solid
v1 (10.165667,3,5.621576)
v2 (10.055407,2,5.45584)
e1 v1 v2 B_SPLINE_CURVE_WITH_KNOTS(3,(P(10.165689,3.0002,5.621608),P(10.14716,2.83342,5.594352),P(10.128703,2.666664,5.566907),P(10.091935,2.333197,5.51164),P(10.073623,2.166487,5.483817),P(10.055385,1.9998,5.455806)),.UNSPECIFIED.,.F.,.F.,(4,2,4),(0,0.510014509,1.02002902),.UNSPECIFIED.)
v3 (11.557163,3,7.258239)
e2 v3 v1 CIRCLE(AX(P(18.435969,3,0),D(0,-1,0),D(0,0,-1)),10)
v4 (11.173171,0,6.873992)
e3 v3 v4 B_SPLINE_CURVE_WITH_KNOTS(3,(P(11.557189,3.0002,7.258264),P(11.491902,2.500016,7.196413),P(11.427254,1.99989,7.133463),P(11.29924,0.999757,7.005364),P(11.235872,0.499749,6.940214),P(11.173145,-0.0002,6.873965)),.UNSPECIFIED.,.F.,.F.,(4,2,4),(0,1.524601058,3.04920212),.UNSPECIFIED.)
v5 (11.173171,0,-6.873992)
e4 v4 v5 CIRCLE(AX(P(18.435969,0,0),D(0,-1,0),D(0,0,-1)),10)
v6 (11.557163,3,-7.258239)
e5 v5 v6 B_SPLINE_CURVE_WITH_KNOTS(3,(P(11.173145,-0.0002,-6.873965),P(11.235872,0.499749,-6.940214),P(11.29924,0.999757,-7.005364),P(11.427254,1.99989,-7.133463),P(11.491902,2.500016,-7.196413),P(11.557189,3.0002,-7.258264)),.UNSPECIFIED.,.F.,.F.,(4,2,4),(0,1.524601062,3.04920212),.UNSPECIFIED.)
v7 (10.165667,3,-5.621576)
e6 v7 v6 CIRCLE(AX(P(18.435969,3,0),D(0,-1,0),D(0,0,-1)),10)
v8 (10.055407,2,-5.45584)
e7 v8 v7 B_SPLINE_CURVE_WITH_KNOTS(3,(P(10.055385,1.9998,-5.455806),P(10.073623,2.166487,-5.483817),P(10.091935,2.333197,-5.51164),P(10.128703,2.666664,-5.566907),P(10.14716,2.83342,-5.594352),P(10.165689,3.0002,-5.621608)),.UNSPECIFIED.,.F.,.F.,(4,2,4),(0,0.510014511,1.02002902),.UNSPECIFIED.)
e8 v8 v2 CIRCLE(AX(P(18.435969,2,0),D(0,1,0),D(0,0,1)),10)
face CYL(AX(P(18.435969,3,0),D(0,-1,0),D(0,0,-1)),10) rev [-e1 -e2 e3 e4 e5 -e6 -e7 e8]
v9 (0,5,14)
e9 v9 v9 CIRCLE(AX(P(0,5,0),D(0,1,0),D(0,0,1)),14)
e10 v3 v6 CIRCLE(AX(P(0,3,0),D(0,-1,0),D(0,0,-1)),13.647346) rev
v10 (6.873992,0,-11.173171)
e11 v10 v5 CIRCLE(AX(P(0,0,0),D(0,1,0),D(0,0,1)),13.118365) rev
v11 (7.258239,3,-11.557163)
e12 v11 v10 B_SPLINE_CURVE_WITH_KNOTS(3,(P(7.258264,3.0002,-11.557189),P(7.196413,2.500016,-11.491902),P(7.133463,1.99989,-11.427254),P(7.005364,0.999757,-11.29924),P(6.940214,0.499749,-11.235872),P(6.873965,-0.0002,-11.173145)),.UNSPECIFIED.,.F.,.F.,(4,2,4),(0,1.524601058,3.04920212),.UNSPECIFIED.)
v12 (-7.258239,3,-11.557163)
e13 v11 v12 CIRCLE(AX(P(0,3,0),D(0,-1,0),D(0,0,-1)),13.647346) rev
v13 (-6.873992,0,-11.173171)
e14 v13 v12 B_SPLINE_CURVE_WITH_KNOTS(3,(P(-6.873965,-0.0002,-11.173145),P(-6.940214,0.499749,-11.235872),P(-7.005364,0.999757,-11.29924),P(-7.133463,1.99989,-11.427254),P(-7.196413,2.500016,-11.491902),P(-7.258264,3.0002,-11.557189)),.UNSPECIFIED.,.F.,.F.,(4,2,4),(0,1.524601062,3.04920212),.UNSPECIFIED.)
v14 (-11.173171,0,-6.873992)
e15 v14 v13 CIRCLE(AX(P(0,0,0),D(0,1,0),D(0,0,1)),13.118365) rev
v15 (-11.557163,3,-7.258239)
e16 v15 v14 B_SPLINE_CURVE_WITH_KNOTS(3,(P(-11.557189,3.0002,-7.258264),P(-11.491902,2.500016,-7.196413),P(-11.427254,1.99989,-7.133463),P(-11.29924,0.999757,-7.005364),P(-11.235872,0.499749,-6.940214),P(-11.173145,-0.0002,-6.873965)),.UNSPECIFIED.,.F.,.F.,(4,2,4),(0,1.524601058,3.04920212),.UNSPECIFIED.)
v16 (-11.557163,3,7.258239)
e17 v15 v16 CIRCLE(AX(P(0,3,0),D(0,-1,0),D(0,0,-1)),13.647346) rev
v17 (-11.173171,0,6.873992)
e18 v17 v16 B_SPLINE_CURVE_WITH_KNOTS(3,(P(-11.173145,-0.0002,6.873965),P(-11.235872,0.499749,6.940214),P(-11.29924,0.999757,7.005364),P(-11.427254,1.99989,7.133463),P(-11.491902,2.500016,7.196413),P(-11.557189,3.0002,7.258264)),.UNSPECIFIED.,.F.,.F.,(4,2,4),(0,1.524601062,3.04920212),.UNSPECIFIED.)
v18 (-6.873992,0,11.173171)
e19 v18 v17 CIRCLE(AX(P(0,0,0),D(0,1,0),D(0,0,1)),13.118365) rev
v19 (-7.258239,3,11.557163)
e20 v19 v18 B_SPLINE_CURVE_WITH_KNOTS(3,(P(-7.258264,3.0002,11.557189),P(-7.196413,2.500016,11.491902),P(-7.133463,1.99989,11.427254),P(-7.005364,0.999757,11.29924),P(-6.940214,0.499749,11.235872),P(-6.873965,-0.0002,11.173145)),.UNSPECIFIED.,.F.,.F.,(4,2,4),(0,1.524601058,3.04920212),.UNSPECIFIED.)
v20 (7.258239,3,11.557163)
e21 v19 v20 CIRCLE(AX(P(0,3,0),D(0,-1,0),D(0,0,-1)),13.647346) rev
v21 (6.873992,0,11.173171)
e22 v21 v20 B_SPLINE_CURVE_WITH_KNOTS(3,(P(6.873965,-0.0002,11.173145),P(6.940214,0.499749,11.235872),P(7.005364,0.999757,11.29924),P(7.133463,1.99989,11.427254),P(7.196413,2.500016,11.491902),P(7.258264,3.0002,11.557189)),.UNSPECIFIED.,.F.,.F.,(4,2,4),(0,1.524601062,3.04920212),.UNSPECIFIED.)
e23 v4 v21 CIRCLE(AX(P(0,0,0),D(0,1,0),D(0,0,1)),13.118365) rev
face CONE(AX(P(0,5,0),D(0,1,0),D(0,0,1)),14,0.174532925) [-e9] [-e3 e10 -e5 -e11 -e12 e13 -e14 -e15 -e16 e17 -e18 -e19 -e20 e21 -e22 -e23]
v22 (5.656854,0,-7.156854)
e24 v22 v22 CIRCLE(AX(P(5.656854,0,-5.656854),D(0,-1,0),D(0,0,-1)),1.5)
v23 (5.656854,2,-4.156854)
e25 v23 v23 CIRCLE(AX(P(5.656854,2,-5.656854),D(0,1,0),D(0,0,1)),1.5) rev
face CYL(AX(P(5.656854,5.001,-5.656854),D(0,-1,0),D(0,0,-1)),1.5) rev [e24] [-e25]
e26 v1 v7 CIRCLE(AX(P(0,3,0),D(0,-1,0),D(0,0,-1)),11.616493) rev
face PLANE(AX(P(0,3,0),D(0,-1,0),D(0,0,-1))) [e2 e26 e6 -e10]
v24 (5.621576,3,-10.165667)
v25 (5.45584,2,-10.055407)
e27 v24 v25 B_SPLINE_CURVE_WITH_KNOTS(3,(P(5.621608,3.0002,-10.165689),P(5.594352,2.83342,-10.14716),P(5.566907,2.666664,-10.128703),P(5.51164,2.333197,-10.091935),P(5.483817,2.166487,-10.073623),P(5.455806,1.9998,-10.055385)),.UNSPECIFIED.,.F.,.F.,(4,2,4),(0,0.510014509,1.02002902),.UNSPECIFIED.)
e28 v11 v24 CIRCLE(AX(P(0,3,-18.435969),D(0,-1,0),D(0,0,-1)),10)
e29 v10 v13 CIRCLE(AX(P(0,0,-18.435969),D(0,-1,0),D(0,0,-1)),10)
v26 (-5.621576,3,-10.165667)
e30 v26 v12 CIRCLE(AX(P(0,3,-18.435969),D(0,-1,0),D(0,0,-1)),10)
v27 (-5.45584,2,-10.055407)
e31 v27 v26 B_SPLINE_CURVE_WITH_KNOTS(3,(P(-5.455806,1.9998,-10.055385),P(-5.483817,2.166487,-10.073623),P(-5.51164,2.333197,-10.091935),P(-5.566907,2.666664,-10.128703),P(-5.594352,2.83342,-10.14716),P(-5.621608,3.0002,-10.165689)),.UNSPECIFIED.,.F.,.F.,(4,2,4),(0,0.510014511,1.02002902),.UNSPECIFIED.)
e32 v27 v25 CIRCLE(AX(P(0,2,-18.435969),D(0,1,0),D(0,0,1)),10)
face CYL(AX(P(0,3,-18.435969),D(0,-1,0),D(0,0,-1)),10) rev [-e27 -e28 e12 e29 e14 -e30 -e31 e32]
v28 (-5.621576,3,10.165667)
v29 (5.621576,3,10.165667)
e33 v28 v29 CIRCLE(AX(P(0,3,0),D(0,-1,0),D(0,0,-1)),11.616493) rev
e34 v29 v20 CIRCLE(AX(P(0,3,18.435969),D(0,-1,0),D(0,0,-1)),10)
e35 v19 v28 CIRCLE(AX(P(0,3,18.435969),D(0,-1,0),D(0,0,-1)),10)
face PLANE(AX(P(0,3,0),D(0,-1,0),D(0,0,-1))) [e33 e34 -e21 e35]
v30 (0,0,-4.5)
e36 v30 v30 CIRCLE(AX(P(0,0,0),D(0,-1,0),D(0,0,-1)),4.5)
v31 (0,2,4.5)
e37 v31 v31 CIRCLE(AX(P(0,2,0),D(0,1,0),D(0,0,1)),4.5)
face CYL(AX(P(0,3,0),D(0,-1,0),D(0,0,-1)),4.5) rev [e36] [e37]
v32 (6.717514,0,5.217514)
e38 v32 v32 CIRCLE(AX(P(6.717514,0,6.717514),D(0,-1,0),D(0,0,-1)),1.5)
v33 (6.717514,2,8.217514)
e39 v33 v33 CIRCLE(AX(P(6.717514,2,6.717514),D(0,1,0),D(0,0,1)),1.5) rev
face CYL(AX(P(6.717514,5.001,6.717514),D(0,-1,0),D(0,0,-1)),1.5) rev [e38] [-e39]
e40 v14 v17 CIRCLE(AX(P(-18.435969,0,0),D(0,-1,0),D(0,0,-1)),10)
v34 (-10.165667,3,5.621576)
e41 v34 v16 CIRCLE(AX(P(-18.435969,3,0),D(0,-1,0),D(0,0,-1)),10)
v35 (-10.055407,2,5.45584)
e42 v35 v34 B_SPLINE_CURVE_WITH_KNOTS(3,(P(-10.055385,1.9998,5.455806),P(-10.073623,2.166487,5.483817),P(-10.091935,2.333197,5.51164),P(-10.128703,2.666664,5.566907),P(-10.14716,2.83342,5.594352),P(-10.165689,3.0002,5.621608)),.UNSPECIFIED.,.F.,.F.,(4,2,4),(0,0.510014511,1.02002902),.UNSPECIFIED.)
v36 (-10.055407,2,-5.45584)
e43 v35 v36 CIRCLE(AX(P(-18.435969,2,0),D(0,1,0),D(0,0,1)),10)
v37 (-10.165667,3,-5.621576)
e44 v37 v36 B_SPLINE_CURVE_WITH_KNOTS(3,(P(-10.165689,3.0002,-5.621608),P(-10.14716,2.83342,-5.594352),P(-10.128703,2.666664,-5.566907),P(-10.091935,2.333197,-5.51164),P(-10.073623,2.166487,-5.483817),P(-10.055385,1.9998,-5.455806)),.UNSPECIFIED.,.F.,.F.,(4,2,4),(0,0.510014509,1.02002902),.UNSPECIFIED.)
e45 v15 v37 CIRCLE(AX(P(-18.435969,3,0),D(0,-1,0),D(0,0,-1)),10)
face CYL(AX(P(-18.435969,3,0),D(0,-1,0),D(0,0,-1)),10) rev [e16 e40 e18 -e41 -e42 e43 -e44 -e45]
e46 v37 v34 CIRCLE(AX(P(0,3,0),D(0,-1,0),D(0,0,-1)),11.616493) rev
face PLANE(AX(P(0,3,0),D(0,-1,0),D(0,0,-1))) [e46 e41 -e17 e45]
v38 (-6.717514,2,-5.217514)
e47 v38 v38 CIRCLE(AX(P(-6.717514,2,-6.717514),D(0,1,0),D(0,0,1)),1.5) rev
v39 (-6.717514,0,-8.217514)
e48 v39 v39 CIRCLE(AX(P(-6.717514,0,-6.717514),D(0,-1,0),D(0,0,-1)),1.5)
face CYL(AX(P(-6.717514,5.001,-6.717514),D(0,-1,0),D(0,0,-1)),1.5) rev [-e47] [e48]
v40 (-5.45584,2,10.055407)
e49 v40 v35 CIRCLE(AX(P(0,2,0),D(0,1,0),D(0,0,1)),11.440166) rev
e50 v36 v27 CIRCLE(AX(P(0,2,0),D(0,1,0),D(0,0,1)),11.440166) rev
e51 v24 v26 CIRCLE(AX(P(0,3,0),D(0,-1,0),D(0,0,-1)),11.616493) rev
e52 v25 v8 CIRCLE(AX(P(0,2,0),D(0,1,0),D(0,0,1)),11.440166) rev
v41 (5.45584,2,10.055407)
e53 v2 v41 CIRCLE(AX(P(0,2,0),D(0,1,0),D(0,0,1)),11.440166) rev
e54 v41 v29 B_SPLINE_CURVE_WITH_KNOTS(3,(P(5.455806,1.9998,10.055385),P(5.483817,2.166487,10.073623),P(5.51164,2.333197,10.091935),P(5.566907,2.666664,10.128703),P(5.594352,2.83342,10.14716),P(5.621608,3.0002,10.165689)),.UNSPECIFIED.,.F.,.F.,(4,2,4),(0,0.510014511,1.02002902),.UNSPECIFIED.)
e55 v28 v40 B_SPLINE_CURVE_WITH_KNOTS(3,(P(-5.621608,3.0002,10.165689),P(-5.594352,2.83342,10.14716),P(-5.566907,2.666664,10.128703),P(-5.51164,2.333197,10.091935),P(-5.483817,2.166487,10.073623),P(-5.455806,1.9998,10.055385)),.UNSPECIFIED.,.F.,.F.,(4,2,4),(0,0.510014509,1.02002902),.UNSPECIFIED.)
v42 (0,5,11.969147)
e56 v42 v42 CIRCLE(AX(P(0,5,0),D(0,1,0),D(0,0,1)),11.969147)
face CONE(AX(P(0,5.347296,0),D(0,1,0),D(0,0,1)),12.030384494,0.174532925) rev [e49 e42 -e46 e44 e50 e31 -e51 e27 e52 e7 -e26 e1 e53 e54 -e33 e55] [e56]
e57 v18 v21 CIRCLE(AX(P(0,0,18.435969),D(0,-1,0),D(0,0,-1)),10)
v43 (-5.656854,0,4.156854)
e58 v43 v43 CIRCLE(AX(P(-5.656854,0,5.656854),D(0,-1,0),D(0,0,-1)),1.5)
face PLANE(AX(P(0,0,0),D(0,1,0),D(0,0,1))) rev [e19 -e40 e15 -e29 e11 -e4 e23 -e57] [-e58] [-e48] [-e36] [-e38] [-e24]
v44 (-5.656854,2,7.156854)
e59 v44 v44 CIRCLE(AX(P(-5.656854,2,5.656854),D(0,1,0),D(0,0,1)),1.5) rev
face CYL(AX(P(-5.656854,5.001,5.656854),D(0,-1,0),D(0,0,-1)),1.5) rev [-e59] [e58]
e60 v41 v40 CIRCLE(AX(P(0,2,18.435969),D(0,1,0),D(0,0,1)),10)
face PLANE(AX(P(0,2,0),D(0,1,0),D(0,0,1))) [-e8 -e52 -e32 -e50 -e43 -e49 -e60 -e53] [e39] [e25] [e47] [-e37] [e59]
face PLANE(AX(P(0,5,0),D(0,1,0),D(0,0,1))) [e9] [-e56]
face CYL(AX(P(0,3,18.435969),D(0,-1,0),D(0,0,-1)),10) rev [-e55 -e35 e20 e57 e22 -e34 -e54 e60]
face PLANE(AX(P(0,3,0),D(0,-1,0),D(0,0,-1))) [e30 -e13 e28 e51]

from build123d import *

# Parameters (mm, degrees)
IZIM1_R                     = 14
Y_KSEKLIK_EKSTR_ZYON1_DEPTH = 5
PAH1_SIZE                   = 5
PAH1_SIZE_2                 = 0.881634904
BO_ALTMA1_T                 = -2
IZIM2_R                     = 4.5
KES_EKSTR_ZYON1_DEPTH       = 3
KES_EKSTR_ZYON2_REACH       = 22.421
IZIM3_R                     = 1.5


with BuildPart() as part:
    # Çizim1 → Yükseklik-Ekstrüzyon1 (new body)
    with BuildSketch(Plane(origin=(0, 0, 0), x_dir=(1, 0, 0), z_dir=(0, 1, 0))):
        with Locations(Location((0, 0, 0), (0, 0, 270))):
            Circle(IZIM1_R)
    extrude(amount=Y_KSEKLIK_EKSTR_ZYON1_DEPTH)

    # Pah1
    # the kernel refuses this chamfer: 5, 0.881634904 mm, written as the material it takes off along each edge
    with BuildSketch(Plane(origin=(0, 0, 0), x_dir=(0, 0, 1), z_dir=(-1, 0, 0))) as pah1_piece_1:
        Polygon((14, PAH1_SIZE), (14 - PAH1_SIZE_2, 0), (14, 0), align=None)
    revolve(axis=Axis((0, 0, 0), (0, 1, 0)), mode=Mode.SUBTRACT)

    # İç Boşaltma1
    bo_altma1_openings = [part.faces().sort_by_distance(p)[0] for p in [
        (0, 5, 0),
    ]]
    offset(amount=BO_ALTMA1_T, openings=bo_altma1_openings, kind=Kind.INTERSECTION)

    # Çizim2 → Kes-Ekstrüzyon1 (cut)
    with BuildSketch(Plane.XZ):
        with BuildLine():
            ThreePointArc((-7.5, 11.821590418), (0, 8.435968695), (7.5, 11.821590418))
            ThreePointArc((7.5, 11.821590418), (0, 14), (-7.5, 11.821590418))
        make_face()
        with Locations(Location((0, 0, 0), (0, 0, 270))):
            Circle(IZIM2_R)
        with BuildLine():
            ThreePointArc((11.821590418, -7.5), (14, 0), (11.821590418, 7.5))
            ThreePointArc((11.821590418, 7.5), (8.435968695, 0), (11.821590418, -7.5))
        make_face()
        with BuildLine():
            ThreePointArc((-7.5, -11.821590418), (0, -14), (7.5, -11.821590418))
            ThreePointArc((7.5, -11.821590418), (0, -8.435968695), (-7.5, -11.821590418))
        make_face()
        with BuildLine():
            ThreePointArc((-11.821590418, 7.5), (-14, 0), (-11.821590418, -7.5))
            ThreePointArc((-11.821590418, -7.5), (-8.435968695, 0), (-11.821590418, 7.5))
        make_face()
    extrude(amount=-KES_EKSTR_ZYON1_DEPTH, mode=Mode.SUBTRACT)

    # Çizim3 → Kes-Ekstrüzyon2 (cut, up to next)
    with BuildSketch(Plane.XZ, mode=Mode.PRIVATE) as kes_ekstr_zyon2_sk1:
        with Locations(Location((-5.656854249, 5.656854249, 0), (0, 0, 270))):
            Circle(IZIM3_R)
    kes_ekstr_zyon2_tool1 = extrude(kes_ekstr_zyon2_sk1.sketch, amount=-KES_EKSTR_ZYON2_REACH, mode=Mode.PRIVATE) & part.part
    # Çizim3 → Kes-Ekstrüzyon2 (cut, up to next)
    with BuildSketch(Plane.XZ, mode=Mode.PRIVATE) as kes_ekstr_zyon2_sk2:
        with Locations(Location((6.717514421, 6.717514421, 0), (0, 0, 270))):
            Circle(IZIM3_R)
    kes_ekstr_zyon2_tool2 = extrude(kes_ekstr_zyon2_sk2.sketch, amount=-KES_EKSTR_ZYON2_REACH, mode=Mode.PRIVATE) & part.part
    # Çizim3 → Kes-Ekstrüzyon2 (cut, up to next)
    with BuildSketch(Plane.XZ, mode=Mode.PRIVATE) as kes_ekstr_zyon2_sk3:
        with Locations(Location((5.656854249, -5.656854249, 0), (0, 0, 270))):
            Circle(IZIM3_R)
    kes_ekstr_zyon2_tool3 = extrude(kes_ekstr_zyon2_sk3.sketch, amount=-KES_EKSTR_ZYON2_REACH, mode=Mode.PRIVATE) & part.part
    # Çizim3 → Kes-Ekstrüzyon2 (cut, up to next)
    with BuildSketch(Plane.XZ, mode=Mode.PRIVATE) as kes_ekstr_zyon2_sk4:
        with Locations(Location((-6.717514421, -6.717514421, 0), (0, 0, 270))):
            Circle(IZIM3_R)
    kes_ekstr_zyon2_tool4 = extrude(kes_ekstr_zyon2_sk4.sketch, amount=-KES_EKSTR_ZYON2_REACH, mode=Mode.PRIVATE) & part.part
    add(kes_ekstr_zyon2_tool1.solids().sort_by_distance((-5.656854, 0, 5.656854))[0], mode=Mode.SUBTRACT)
    add(kes_ekstr_zyon2_tool2.solids().sort_by_distance((6.717514, 0, 6.717514))[0], mode=Mode.SUBTRACT)
    add(kes_ekstr_zyon2_tool3.solids().sort_by_distance((5.656854, 0, -5.656854))[0], mode=Mode.SUBTRACT)
    add(kes_ekstr_zyon2_tool4.solids().sort_by_distance((-6.717514, 0, -6.717514))[0], mode=Mode.SUBTRACT)


solid = part.part
